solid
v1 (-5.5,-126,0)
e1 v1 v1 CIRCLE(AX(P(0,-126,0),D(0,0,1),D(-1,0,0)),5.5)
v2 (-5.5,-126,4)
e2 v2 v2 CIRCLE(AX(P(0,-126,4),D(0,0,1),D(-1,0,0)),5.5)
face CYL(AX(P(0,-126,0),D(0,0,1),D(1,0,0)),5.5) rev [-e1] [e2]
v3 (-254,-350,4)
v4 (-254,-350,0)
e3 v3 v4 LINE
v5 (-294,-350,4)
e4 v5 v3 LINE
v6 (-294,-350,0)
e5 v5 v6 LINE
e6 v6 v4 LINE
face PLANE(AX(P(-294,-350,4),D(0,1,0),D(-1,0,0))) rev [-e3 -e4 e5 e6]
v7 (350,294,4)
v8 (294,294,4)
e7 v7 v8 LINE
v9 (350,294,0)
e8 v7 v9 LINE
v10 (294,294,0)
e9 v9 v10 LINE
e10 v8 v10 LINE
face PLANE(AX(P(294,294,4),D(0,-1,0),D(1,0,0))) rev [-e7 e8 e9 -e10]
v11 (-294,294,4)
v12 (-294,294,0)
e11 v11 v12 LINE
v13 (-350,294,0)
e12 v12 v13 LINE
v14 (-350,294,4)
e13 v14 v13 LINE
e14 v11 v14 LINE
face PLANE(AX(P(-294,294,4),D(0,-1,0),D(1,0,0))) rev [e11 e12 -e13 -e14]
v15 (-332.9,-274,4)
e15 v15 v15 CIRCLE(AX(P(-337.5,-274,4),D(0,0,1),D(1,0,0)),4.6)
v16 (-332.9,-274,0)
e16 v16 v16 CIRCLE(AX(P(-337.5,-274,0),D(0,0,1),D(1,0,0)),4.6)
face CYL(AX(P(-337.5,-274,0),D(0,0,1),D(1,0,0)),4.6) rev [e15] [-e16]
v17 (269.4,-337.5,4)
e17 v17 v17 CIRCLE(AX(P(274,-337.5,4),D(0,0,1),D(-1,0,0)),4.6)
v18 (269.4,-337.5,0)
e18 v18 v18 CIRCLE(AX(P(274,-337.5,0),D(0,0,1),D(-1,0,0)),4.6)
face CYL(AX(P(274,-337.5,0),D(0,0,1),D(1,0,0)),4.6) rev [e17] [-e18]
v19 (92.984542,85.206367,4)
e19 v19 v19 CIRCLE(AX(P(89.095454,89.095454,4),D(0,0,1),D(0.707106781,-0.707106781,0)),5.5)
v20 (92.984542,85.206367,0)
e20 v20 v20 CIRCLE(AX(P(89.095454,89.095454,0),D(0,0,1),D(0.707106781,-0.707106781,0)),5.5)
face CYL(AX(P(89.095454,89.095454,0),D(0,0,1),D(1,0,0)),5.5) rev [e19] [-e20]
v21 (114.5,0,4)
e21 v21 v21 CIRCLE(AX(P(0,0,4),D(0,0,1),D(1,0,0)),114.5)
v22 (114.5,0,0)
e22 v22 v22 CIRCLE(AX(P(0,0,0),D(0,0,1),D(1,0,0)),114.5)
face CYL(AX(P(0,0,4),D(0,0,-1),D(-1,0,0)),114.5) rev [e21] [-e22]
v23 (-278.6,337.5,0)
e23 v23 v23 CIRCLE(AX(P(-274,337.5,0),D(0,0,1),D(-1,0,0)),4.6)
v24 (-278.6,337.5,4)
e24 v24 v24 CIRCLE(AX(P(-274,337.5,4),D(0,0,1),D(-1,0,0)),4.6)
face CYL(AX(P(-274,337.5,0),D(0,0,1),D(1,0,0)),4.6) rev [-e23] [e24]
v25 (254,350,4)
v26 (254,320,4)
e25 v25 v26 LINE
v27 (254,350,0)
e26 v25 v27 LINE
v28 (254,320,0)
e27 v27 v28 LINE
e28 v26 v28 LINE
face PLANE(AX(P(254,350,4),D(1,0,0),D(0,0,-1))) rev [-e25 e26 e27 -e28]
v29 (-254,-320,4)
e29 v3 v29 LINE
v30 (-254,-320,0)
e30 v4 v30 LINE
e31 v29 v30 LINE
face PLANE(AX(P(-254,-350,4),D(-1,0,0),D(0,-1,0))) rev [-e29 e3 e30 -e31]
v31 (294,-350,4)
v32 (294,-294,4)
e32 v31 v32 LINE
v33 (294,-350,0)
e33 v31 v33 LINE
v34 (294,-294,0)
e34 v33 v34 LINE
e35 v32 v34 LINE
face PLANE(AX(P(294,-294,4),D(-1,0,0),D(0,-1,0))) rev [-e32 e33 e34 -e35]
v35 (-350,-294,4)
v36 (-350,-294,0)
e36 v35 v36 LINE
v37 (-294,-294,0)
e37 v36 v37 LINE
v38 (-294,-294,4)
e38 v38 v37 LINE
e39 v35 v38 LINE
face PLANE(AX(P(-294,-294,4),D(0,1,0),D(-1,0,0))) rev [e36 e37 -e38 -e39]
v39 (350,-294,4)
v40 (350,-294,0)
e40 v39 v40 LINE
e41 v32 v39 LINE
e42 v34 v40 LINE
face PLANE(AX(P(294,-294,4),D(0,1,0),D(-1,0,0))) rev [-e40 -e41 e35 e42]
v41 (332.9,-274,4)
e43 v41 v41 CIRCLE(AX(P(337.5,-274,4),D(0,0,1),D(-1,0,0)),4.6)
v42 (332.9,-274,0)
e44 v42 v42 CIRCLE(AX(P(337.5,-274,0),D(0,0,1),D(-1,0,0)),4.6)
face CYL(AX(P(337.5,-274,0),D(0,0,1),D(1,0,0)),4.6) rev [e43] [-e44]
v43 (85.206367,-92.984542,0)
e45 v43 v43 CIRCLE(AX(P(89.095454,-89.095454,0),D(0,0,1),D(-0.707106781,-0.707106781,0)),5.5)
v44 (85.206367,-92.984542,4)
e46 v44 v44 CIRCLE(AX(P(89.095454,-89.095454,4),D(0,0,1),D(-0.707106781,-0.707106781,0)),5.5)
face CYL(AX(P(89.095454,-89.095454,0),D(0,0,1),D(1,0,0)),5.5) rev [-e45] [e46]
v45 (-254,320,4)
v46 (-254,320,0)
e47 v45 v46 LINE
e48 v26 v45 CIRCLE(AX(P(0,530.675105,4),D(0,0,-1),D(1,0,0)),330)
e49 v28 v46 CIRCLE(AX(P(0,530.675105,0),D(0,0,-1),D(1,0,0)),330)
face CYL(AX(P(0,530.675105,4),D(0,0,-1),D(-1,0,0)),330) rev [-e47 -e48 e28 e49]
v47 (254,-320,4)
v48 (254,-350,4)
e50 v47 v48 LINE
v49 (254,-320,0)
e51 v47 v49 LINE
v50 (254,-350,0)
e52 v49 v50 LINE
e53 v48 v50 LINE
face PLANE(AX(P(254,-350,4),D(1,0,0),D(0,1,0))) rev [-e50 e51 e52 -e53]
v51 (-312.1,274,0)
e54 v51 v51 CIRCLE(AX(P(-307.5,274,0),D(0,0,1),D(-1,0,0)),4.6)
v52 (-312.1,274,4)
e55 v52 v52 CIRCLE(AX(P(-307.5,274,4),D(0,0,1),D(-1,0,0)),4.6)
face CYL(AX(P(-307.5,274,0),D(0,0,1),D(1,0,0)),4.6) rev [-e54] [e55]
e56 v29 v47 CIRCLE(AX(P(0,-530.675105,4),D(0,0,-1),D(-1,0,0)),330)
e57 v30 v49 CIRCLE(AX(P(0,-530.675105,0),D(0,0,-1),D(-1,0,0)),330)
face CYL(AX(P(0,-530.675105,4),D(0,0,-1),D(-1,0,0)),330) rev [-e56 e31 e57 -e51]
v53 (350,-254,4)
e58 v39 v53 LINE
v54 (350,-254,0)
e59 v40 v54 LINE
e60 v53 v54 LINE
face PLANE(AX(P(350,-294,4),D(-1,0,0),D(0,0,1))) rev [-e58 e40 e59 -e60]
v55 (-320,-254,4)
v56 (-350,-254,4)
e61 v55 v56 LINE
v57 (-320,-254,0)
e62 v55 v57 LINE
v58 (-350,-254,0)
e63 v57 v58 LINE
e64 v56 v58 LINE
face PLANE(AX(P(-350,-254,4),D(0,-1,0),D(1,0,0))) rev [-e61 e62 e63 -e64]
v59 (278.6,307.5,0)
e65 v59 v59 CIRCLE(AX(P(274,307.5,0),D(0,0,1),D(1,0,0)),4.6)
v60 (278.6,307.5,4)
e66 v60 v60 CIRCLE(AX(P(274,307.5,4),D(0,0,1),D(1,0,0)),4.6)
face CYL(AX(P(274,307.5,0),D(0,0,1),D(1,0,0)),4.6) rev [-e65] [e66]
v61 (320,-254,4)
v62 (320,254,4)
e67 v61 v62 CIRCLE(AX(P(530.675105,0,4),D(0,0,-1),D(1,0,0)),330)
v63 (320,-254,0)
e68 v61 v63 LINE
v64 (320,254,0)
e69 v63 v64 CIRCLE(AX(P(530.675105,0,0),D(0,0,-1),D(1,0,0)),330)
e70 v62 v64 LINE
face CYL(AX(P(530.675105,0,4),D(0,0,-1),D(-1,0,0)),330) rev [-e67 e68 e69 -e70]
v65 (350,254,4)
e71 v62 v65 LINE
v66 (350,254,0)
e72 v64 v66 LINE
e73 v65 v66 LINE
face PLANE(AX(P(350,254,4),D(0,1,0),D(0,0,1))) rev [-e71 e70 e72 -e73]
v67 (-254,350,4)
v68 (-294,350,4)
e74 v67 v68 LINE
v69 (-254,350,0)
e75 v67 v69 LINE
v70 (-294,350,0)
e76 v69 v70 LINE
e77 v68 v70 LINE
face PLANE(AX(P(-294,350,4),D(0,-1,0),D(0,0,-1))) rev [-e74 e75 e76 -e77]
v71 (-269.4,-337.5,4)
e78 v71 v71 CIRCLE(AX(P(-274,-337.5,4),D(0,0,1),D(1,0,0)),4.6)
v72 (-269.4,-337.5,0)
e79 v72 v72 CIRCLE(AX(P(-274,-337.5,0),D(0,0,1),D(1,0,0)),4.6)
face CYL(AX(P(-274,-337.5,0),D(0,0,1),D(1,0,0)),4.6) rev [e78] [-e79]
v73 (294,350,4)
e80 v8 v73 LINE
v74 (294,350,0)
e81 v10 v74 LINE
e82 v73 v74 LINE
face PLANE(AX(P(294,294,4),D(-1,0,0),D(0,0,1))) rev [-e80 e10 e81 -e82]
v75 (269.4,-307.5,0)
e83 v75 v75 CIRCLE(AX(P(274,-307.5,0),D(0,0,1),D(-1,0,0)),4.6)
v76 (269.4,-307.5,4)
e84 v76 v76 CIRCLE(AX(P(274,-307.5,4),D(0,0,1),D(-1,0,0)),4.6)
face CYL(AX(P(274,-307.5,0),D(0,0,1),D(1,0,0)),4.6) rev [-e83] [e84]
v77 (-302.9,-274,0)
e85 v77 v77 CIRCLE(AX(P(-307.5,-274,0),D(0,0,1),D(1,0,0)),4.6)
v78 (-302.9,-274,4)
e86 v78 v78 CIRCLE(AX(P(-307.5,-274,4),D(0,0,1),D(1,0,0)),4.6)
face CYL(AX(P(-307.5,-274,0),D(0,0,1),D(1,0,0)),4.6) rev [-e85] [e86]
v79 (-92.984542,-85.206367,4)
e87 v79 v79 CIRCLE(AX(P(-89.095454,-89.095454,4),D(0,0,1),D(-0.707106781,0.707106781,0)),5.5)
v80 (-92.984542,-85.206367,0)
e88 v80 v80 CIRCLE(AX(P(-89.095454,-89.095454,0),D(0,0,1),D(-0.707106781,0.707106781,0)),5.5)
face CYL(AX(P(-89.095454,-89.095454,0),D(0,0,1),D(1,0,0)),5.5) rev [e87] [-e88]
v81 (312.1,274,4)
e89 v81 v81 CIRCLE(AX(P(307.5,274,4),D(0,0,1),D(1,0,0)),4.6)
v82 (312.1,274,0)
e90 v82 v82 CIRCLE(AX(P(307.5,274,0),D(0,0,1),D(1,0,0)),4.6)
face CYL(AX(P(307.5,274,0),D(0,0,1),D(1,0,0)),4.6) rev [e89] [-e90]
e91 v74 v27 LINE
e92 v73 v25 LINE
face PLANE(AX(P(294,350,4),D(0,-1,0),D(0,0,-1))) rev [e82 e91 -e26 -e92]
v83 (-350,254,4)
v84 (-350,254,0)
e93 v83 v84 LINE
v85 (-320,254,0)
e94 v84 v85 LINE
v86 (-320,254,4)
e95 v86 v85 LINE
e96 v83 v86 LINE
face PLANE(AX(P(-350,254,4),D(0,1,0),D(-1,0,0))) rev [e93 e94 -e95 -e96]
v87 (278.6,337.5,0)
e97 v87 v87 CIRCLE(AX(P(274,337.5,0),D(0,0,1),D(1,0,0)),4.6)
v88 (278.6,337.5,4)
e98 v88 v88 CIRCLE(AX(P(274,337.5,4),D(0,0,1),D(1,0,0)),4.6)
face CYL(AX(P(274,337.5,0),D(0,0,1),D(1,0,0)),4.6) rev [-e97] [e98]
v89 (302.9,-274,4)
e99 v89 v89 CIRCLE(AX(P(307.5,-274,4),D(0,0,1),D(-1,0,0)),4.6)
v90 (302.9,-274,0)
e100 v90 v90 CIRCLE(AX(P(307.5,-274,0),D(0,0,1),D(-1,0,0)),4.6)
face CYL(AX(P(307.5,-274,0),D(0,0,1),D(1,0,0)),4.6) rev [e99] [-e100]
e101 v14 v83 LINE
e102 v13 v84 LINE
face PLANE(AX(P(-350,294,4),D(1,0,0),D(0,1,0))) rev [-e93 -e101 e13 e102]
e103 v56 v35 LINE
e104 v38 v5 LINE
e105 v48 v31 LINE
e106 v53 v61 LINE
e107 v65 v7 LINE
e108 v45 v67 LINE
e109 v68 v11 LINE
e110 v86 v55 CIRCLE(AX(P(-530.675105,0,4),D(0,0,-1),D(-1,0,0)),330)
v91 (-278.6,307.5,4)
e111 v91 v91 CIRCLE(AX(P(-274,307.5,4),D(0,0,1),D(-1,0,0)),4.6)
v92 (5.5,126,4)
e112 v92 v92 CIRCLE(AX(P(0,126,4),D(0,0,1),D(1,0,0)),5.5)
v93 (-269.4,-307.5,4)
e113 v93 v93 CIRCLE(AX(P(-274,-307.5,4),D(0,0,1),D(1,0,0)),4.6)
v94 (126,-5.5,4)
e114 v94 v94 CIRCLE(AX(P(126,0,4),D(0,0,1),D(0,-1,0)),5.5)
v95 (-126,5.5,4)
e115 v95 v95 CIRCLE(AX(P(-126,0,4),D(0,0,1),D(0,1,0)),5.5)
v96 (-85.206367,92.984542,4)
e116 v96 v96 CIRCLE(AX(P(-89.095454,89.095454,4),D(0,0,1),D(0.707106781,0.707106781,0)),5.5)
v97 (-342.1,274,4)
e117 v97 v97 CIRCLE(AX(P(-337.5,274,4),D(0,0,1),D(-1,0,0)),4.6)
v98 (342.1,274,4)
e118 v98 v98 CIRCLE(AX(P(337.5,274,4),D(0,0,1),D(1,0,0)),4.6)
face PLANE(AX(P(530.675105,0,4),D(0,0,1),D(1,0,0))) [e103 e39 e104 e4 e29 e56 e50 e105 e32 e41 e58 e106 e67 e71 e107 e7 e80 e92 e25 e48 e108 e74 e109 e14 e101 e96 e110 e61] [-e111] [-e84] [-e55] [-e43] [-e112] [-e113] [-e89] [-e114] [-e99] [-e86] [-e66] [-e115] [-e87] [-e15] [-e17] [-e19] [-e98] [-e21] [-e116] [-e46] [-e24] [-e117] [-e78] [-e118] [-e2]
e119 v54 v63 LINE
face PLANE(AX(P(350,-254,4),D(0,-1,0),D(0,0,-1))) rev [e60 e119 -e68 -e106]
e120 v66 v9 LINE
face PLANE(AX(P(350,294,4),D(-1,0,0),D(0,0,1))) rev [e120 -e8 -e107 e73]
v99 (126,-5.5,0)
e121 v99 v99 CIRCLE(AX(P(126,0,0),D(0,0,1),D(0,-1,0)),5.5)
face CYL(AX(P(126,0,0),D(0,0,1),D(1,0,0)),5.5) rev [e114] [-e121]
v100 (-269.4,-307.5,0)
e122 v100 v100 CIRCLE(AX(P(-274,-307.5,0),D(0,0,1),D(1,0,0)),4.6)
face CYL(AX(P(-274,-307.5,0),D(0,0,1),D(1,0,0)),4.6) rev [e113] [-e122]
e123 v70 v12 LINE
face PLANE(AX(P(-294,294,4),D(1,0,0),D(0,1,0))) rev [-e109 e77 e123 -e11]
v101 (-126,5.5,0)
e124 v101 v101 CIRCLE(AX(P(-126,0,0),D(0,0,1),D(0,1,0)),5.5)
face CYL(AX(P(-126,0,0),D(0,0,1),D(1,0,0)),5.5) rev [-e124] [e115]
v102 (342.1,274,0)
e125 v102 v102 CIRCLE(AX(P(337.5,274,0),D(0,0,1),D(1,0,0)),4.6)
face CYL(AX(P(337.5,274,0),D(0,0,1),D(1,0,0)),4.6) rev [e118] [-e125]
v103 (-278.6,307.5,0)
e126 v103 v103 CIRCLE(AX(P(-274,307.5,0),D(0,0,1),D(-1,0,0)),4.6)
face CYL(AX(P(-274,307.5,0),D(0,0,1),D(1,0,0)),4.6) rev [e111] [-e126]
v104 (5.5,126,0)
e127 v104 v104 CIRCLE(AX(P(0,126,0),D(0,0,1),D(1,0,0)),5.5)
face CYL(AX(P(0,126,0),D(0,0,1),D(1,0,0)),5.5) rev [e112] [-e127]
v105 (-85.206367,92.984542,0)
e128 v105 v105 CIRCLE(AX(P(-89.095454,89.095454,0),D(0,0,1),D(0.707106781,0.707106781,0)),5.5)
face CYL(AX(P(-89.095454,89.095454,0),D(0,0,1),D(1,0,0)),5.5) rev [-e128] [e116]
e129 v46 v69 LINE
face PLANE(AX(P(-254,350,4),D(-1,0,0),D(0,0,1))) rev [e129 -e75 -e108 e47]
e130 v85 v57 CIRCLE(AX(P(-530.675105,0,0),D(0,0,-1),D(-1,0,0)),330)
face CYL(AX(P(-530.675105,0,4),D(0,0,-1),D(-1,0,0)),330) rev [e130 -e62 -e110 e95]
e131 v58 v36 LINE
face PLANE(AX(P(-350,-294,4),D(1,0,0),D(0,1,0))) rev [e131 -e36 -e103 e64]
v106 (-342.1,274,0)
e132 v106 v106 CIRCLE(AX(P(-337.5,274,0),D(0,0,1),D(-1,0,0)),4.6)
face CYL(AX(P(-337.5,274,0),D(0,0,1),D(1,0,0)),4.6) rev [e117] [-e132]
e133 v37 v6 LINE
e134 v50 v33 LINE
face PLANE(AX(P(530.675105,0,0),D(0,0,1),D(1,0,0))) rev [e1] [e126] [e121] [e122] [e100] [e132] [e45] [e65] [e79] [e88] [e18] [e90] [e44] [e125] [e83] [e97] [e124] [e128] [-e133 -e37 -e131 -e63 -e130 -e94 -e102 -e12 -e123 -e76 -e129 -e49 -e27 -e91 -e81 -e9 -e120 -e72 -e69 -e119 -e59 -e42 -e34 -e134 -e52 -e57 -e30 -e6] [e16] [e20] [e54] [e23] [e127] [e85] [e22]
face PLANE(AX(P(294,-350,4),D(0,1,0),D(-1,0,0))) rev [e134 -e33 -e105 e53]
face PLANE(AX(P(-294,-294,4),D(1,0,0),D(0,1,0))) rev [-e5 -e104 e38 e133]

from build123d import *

# Parameters (mm, degrees)
SKETCH1_R          = 114.5
BASE_FLANGE1_DEPTH = 4
SKETCH2_R          = 4.6
EXTRUDE1_DEPTH     = 4
SKETCH3_R          = 5.5
EXTRUDE2_DEPTH     = 4
CIRPATTERN1_COUNT  = 8


# Sheet-metal steps are written as plain solids
with BuildPart() as part:
    # Sketch1 → Base-Flange1 (new body)
    with BuildSketch(Plane.XY):
        with BuildLine():
            Line((294, 294), (294, 350))
            Line((294, 350), (254, 350))
            Line((254, 350), (254, 320))
            ThreePointArc((254, 320), (0, 200.675105316), (-254, 320))
            Line((-254, 320), (-254, 350))
            Line((-254, 350), (-294, 350))
            Line((-294, 350), (-294, 294))
            Line((-294, 294), (-350, 294))
            Line((-350, 294), (-350, 254))
            Line((-350, 254), (-320, 254))
            ThreePointArc((-320, 254), (-200.675105316, 0), (-320, -254))
            Line((-320, -254), (-350, -254))
            Line((-350, -254), (-350, -294))
            Line((-350, -294), (-294, -294))
            Line((-294, -294), (-294, -350))
            Line((-294, -350), (-254, -350))
            Line((-254, -350), (-254, -320))
            ThreePointArc((-254, -320), (0, -200.675105316), (254, -320))
            Line((254, -320), (254, -350))
            Line((254, -350), (294, -350))
            Line((294, -350), (294, -294))
            Line((294, -294), (350, -294))
            Line((350, -294), (350, -254))
            Line((350, -254), (320, -254))
            ThreePointArc((320, -254), (200.675105316, 0), (320, 254))
            Line((320, 254), (350, 254))
            Line((350, 254), (350, 294))
            Line((350, 294), (294, 294))
        make_face()
        Circle(SKETCH1_R, mode=Mode.SUBTRACT)
    extrude(amount=BASE_FLANGE1_DEPTH)

    # Sketch2 → Extrude1 (cut)
    with BuildSketch(Plane.XY.offset(4)):
        with Locations((274, 337.5)):
            Circle(SKETCH2_R)
        with Locations((274, 307.5)):
            Circle(SKETCH2_R)
        with Locations((307.5, 274)):
            Circle(SKETCH2_R)
        with Locations((337.5, 274)):
            Circle(SKETCH2_R)
        with Locations(Location((337.5, -274, 0), (0, 0, 180))):
            Circle(SKETCH2_R)
        with Locations(Location((307.5, -274, 0), (0, 0, 180))):
            Circle(SKETCH2_R)
        with Locations(Location((274, -307.5, 0), (0, 0, 180))):
            Circle(SKETCH2_R)
        with Locations(Location((274, -337.5, 0), (0, 0, 180))):
            Circle(SKETCH2_R)
        with Locations((-274, -337.5)):
            Circle(SKETCH2_R)
        with Locations((-274, -307.5)):
            Circle(SKETCH2_R)
        with Locations((-307.5, -274)):
            Circle(SKETCH2_R)
        with Locations((-337.5, -274)):
            Circle(SKETCH2_R)
        with Locations(Location((-337.5, 274, 0), (0, 0, 180))):
            Circle(SKETCH2_R)
        with Locations(Location((-307.5, 274, 0), (0, 0, 180))):
            Circle(SKETCH2_R)
        with Locations(Location((-274, 307.5, 0), (0, 0, 180))):
            Circle(SKETCH2_R)
        with Locations(Location((-274, 337.5, 0), (0, 0, 180))):
            Circle(SKETCH2_R)
    extrude(amount=-EXTRUDE1_DEPTH, mode=Mode.SUBTRACT)

    # Sketch3 → Extrude2 (cut)
    with BuildSketch(Plane.XY.offset(4)):
        with Locations((0, 126)):
            Circle(SKETCH3_R)
    extrude2 = extrude(amount=-EXTRUDE2_DEPTH, mode=Mode.SUBTRACT)

    # CirPattern1: Extrude2 ×8 about axis
    cirpattern1_axis = Axis((0, 0, 0), (0, 0, 1))
    for i in range(1, CIRPATTERN1_COUNT):
        add(extrude2.rotate(cirpattern1_axis, i * 360 / CIRPATTERN1_COUNT), mode=Mode.SUBTRACT)


solid = part.part
